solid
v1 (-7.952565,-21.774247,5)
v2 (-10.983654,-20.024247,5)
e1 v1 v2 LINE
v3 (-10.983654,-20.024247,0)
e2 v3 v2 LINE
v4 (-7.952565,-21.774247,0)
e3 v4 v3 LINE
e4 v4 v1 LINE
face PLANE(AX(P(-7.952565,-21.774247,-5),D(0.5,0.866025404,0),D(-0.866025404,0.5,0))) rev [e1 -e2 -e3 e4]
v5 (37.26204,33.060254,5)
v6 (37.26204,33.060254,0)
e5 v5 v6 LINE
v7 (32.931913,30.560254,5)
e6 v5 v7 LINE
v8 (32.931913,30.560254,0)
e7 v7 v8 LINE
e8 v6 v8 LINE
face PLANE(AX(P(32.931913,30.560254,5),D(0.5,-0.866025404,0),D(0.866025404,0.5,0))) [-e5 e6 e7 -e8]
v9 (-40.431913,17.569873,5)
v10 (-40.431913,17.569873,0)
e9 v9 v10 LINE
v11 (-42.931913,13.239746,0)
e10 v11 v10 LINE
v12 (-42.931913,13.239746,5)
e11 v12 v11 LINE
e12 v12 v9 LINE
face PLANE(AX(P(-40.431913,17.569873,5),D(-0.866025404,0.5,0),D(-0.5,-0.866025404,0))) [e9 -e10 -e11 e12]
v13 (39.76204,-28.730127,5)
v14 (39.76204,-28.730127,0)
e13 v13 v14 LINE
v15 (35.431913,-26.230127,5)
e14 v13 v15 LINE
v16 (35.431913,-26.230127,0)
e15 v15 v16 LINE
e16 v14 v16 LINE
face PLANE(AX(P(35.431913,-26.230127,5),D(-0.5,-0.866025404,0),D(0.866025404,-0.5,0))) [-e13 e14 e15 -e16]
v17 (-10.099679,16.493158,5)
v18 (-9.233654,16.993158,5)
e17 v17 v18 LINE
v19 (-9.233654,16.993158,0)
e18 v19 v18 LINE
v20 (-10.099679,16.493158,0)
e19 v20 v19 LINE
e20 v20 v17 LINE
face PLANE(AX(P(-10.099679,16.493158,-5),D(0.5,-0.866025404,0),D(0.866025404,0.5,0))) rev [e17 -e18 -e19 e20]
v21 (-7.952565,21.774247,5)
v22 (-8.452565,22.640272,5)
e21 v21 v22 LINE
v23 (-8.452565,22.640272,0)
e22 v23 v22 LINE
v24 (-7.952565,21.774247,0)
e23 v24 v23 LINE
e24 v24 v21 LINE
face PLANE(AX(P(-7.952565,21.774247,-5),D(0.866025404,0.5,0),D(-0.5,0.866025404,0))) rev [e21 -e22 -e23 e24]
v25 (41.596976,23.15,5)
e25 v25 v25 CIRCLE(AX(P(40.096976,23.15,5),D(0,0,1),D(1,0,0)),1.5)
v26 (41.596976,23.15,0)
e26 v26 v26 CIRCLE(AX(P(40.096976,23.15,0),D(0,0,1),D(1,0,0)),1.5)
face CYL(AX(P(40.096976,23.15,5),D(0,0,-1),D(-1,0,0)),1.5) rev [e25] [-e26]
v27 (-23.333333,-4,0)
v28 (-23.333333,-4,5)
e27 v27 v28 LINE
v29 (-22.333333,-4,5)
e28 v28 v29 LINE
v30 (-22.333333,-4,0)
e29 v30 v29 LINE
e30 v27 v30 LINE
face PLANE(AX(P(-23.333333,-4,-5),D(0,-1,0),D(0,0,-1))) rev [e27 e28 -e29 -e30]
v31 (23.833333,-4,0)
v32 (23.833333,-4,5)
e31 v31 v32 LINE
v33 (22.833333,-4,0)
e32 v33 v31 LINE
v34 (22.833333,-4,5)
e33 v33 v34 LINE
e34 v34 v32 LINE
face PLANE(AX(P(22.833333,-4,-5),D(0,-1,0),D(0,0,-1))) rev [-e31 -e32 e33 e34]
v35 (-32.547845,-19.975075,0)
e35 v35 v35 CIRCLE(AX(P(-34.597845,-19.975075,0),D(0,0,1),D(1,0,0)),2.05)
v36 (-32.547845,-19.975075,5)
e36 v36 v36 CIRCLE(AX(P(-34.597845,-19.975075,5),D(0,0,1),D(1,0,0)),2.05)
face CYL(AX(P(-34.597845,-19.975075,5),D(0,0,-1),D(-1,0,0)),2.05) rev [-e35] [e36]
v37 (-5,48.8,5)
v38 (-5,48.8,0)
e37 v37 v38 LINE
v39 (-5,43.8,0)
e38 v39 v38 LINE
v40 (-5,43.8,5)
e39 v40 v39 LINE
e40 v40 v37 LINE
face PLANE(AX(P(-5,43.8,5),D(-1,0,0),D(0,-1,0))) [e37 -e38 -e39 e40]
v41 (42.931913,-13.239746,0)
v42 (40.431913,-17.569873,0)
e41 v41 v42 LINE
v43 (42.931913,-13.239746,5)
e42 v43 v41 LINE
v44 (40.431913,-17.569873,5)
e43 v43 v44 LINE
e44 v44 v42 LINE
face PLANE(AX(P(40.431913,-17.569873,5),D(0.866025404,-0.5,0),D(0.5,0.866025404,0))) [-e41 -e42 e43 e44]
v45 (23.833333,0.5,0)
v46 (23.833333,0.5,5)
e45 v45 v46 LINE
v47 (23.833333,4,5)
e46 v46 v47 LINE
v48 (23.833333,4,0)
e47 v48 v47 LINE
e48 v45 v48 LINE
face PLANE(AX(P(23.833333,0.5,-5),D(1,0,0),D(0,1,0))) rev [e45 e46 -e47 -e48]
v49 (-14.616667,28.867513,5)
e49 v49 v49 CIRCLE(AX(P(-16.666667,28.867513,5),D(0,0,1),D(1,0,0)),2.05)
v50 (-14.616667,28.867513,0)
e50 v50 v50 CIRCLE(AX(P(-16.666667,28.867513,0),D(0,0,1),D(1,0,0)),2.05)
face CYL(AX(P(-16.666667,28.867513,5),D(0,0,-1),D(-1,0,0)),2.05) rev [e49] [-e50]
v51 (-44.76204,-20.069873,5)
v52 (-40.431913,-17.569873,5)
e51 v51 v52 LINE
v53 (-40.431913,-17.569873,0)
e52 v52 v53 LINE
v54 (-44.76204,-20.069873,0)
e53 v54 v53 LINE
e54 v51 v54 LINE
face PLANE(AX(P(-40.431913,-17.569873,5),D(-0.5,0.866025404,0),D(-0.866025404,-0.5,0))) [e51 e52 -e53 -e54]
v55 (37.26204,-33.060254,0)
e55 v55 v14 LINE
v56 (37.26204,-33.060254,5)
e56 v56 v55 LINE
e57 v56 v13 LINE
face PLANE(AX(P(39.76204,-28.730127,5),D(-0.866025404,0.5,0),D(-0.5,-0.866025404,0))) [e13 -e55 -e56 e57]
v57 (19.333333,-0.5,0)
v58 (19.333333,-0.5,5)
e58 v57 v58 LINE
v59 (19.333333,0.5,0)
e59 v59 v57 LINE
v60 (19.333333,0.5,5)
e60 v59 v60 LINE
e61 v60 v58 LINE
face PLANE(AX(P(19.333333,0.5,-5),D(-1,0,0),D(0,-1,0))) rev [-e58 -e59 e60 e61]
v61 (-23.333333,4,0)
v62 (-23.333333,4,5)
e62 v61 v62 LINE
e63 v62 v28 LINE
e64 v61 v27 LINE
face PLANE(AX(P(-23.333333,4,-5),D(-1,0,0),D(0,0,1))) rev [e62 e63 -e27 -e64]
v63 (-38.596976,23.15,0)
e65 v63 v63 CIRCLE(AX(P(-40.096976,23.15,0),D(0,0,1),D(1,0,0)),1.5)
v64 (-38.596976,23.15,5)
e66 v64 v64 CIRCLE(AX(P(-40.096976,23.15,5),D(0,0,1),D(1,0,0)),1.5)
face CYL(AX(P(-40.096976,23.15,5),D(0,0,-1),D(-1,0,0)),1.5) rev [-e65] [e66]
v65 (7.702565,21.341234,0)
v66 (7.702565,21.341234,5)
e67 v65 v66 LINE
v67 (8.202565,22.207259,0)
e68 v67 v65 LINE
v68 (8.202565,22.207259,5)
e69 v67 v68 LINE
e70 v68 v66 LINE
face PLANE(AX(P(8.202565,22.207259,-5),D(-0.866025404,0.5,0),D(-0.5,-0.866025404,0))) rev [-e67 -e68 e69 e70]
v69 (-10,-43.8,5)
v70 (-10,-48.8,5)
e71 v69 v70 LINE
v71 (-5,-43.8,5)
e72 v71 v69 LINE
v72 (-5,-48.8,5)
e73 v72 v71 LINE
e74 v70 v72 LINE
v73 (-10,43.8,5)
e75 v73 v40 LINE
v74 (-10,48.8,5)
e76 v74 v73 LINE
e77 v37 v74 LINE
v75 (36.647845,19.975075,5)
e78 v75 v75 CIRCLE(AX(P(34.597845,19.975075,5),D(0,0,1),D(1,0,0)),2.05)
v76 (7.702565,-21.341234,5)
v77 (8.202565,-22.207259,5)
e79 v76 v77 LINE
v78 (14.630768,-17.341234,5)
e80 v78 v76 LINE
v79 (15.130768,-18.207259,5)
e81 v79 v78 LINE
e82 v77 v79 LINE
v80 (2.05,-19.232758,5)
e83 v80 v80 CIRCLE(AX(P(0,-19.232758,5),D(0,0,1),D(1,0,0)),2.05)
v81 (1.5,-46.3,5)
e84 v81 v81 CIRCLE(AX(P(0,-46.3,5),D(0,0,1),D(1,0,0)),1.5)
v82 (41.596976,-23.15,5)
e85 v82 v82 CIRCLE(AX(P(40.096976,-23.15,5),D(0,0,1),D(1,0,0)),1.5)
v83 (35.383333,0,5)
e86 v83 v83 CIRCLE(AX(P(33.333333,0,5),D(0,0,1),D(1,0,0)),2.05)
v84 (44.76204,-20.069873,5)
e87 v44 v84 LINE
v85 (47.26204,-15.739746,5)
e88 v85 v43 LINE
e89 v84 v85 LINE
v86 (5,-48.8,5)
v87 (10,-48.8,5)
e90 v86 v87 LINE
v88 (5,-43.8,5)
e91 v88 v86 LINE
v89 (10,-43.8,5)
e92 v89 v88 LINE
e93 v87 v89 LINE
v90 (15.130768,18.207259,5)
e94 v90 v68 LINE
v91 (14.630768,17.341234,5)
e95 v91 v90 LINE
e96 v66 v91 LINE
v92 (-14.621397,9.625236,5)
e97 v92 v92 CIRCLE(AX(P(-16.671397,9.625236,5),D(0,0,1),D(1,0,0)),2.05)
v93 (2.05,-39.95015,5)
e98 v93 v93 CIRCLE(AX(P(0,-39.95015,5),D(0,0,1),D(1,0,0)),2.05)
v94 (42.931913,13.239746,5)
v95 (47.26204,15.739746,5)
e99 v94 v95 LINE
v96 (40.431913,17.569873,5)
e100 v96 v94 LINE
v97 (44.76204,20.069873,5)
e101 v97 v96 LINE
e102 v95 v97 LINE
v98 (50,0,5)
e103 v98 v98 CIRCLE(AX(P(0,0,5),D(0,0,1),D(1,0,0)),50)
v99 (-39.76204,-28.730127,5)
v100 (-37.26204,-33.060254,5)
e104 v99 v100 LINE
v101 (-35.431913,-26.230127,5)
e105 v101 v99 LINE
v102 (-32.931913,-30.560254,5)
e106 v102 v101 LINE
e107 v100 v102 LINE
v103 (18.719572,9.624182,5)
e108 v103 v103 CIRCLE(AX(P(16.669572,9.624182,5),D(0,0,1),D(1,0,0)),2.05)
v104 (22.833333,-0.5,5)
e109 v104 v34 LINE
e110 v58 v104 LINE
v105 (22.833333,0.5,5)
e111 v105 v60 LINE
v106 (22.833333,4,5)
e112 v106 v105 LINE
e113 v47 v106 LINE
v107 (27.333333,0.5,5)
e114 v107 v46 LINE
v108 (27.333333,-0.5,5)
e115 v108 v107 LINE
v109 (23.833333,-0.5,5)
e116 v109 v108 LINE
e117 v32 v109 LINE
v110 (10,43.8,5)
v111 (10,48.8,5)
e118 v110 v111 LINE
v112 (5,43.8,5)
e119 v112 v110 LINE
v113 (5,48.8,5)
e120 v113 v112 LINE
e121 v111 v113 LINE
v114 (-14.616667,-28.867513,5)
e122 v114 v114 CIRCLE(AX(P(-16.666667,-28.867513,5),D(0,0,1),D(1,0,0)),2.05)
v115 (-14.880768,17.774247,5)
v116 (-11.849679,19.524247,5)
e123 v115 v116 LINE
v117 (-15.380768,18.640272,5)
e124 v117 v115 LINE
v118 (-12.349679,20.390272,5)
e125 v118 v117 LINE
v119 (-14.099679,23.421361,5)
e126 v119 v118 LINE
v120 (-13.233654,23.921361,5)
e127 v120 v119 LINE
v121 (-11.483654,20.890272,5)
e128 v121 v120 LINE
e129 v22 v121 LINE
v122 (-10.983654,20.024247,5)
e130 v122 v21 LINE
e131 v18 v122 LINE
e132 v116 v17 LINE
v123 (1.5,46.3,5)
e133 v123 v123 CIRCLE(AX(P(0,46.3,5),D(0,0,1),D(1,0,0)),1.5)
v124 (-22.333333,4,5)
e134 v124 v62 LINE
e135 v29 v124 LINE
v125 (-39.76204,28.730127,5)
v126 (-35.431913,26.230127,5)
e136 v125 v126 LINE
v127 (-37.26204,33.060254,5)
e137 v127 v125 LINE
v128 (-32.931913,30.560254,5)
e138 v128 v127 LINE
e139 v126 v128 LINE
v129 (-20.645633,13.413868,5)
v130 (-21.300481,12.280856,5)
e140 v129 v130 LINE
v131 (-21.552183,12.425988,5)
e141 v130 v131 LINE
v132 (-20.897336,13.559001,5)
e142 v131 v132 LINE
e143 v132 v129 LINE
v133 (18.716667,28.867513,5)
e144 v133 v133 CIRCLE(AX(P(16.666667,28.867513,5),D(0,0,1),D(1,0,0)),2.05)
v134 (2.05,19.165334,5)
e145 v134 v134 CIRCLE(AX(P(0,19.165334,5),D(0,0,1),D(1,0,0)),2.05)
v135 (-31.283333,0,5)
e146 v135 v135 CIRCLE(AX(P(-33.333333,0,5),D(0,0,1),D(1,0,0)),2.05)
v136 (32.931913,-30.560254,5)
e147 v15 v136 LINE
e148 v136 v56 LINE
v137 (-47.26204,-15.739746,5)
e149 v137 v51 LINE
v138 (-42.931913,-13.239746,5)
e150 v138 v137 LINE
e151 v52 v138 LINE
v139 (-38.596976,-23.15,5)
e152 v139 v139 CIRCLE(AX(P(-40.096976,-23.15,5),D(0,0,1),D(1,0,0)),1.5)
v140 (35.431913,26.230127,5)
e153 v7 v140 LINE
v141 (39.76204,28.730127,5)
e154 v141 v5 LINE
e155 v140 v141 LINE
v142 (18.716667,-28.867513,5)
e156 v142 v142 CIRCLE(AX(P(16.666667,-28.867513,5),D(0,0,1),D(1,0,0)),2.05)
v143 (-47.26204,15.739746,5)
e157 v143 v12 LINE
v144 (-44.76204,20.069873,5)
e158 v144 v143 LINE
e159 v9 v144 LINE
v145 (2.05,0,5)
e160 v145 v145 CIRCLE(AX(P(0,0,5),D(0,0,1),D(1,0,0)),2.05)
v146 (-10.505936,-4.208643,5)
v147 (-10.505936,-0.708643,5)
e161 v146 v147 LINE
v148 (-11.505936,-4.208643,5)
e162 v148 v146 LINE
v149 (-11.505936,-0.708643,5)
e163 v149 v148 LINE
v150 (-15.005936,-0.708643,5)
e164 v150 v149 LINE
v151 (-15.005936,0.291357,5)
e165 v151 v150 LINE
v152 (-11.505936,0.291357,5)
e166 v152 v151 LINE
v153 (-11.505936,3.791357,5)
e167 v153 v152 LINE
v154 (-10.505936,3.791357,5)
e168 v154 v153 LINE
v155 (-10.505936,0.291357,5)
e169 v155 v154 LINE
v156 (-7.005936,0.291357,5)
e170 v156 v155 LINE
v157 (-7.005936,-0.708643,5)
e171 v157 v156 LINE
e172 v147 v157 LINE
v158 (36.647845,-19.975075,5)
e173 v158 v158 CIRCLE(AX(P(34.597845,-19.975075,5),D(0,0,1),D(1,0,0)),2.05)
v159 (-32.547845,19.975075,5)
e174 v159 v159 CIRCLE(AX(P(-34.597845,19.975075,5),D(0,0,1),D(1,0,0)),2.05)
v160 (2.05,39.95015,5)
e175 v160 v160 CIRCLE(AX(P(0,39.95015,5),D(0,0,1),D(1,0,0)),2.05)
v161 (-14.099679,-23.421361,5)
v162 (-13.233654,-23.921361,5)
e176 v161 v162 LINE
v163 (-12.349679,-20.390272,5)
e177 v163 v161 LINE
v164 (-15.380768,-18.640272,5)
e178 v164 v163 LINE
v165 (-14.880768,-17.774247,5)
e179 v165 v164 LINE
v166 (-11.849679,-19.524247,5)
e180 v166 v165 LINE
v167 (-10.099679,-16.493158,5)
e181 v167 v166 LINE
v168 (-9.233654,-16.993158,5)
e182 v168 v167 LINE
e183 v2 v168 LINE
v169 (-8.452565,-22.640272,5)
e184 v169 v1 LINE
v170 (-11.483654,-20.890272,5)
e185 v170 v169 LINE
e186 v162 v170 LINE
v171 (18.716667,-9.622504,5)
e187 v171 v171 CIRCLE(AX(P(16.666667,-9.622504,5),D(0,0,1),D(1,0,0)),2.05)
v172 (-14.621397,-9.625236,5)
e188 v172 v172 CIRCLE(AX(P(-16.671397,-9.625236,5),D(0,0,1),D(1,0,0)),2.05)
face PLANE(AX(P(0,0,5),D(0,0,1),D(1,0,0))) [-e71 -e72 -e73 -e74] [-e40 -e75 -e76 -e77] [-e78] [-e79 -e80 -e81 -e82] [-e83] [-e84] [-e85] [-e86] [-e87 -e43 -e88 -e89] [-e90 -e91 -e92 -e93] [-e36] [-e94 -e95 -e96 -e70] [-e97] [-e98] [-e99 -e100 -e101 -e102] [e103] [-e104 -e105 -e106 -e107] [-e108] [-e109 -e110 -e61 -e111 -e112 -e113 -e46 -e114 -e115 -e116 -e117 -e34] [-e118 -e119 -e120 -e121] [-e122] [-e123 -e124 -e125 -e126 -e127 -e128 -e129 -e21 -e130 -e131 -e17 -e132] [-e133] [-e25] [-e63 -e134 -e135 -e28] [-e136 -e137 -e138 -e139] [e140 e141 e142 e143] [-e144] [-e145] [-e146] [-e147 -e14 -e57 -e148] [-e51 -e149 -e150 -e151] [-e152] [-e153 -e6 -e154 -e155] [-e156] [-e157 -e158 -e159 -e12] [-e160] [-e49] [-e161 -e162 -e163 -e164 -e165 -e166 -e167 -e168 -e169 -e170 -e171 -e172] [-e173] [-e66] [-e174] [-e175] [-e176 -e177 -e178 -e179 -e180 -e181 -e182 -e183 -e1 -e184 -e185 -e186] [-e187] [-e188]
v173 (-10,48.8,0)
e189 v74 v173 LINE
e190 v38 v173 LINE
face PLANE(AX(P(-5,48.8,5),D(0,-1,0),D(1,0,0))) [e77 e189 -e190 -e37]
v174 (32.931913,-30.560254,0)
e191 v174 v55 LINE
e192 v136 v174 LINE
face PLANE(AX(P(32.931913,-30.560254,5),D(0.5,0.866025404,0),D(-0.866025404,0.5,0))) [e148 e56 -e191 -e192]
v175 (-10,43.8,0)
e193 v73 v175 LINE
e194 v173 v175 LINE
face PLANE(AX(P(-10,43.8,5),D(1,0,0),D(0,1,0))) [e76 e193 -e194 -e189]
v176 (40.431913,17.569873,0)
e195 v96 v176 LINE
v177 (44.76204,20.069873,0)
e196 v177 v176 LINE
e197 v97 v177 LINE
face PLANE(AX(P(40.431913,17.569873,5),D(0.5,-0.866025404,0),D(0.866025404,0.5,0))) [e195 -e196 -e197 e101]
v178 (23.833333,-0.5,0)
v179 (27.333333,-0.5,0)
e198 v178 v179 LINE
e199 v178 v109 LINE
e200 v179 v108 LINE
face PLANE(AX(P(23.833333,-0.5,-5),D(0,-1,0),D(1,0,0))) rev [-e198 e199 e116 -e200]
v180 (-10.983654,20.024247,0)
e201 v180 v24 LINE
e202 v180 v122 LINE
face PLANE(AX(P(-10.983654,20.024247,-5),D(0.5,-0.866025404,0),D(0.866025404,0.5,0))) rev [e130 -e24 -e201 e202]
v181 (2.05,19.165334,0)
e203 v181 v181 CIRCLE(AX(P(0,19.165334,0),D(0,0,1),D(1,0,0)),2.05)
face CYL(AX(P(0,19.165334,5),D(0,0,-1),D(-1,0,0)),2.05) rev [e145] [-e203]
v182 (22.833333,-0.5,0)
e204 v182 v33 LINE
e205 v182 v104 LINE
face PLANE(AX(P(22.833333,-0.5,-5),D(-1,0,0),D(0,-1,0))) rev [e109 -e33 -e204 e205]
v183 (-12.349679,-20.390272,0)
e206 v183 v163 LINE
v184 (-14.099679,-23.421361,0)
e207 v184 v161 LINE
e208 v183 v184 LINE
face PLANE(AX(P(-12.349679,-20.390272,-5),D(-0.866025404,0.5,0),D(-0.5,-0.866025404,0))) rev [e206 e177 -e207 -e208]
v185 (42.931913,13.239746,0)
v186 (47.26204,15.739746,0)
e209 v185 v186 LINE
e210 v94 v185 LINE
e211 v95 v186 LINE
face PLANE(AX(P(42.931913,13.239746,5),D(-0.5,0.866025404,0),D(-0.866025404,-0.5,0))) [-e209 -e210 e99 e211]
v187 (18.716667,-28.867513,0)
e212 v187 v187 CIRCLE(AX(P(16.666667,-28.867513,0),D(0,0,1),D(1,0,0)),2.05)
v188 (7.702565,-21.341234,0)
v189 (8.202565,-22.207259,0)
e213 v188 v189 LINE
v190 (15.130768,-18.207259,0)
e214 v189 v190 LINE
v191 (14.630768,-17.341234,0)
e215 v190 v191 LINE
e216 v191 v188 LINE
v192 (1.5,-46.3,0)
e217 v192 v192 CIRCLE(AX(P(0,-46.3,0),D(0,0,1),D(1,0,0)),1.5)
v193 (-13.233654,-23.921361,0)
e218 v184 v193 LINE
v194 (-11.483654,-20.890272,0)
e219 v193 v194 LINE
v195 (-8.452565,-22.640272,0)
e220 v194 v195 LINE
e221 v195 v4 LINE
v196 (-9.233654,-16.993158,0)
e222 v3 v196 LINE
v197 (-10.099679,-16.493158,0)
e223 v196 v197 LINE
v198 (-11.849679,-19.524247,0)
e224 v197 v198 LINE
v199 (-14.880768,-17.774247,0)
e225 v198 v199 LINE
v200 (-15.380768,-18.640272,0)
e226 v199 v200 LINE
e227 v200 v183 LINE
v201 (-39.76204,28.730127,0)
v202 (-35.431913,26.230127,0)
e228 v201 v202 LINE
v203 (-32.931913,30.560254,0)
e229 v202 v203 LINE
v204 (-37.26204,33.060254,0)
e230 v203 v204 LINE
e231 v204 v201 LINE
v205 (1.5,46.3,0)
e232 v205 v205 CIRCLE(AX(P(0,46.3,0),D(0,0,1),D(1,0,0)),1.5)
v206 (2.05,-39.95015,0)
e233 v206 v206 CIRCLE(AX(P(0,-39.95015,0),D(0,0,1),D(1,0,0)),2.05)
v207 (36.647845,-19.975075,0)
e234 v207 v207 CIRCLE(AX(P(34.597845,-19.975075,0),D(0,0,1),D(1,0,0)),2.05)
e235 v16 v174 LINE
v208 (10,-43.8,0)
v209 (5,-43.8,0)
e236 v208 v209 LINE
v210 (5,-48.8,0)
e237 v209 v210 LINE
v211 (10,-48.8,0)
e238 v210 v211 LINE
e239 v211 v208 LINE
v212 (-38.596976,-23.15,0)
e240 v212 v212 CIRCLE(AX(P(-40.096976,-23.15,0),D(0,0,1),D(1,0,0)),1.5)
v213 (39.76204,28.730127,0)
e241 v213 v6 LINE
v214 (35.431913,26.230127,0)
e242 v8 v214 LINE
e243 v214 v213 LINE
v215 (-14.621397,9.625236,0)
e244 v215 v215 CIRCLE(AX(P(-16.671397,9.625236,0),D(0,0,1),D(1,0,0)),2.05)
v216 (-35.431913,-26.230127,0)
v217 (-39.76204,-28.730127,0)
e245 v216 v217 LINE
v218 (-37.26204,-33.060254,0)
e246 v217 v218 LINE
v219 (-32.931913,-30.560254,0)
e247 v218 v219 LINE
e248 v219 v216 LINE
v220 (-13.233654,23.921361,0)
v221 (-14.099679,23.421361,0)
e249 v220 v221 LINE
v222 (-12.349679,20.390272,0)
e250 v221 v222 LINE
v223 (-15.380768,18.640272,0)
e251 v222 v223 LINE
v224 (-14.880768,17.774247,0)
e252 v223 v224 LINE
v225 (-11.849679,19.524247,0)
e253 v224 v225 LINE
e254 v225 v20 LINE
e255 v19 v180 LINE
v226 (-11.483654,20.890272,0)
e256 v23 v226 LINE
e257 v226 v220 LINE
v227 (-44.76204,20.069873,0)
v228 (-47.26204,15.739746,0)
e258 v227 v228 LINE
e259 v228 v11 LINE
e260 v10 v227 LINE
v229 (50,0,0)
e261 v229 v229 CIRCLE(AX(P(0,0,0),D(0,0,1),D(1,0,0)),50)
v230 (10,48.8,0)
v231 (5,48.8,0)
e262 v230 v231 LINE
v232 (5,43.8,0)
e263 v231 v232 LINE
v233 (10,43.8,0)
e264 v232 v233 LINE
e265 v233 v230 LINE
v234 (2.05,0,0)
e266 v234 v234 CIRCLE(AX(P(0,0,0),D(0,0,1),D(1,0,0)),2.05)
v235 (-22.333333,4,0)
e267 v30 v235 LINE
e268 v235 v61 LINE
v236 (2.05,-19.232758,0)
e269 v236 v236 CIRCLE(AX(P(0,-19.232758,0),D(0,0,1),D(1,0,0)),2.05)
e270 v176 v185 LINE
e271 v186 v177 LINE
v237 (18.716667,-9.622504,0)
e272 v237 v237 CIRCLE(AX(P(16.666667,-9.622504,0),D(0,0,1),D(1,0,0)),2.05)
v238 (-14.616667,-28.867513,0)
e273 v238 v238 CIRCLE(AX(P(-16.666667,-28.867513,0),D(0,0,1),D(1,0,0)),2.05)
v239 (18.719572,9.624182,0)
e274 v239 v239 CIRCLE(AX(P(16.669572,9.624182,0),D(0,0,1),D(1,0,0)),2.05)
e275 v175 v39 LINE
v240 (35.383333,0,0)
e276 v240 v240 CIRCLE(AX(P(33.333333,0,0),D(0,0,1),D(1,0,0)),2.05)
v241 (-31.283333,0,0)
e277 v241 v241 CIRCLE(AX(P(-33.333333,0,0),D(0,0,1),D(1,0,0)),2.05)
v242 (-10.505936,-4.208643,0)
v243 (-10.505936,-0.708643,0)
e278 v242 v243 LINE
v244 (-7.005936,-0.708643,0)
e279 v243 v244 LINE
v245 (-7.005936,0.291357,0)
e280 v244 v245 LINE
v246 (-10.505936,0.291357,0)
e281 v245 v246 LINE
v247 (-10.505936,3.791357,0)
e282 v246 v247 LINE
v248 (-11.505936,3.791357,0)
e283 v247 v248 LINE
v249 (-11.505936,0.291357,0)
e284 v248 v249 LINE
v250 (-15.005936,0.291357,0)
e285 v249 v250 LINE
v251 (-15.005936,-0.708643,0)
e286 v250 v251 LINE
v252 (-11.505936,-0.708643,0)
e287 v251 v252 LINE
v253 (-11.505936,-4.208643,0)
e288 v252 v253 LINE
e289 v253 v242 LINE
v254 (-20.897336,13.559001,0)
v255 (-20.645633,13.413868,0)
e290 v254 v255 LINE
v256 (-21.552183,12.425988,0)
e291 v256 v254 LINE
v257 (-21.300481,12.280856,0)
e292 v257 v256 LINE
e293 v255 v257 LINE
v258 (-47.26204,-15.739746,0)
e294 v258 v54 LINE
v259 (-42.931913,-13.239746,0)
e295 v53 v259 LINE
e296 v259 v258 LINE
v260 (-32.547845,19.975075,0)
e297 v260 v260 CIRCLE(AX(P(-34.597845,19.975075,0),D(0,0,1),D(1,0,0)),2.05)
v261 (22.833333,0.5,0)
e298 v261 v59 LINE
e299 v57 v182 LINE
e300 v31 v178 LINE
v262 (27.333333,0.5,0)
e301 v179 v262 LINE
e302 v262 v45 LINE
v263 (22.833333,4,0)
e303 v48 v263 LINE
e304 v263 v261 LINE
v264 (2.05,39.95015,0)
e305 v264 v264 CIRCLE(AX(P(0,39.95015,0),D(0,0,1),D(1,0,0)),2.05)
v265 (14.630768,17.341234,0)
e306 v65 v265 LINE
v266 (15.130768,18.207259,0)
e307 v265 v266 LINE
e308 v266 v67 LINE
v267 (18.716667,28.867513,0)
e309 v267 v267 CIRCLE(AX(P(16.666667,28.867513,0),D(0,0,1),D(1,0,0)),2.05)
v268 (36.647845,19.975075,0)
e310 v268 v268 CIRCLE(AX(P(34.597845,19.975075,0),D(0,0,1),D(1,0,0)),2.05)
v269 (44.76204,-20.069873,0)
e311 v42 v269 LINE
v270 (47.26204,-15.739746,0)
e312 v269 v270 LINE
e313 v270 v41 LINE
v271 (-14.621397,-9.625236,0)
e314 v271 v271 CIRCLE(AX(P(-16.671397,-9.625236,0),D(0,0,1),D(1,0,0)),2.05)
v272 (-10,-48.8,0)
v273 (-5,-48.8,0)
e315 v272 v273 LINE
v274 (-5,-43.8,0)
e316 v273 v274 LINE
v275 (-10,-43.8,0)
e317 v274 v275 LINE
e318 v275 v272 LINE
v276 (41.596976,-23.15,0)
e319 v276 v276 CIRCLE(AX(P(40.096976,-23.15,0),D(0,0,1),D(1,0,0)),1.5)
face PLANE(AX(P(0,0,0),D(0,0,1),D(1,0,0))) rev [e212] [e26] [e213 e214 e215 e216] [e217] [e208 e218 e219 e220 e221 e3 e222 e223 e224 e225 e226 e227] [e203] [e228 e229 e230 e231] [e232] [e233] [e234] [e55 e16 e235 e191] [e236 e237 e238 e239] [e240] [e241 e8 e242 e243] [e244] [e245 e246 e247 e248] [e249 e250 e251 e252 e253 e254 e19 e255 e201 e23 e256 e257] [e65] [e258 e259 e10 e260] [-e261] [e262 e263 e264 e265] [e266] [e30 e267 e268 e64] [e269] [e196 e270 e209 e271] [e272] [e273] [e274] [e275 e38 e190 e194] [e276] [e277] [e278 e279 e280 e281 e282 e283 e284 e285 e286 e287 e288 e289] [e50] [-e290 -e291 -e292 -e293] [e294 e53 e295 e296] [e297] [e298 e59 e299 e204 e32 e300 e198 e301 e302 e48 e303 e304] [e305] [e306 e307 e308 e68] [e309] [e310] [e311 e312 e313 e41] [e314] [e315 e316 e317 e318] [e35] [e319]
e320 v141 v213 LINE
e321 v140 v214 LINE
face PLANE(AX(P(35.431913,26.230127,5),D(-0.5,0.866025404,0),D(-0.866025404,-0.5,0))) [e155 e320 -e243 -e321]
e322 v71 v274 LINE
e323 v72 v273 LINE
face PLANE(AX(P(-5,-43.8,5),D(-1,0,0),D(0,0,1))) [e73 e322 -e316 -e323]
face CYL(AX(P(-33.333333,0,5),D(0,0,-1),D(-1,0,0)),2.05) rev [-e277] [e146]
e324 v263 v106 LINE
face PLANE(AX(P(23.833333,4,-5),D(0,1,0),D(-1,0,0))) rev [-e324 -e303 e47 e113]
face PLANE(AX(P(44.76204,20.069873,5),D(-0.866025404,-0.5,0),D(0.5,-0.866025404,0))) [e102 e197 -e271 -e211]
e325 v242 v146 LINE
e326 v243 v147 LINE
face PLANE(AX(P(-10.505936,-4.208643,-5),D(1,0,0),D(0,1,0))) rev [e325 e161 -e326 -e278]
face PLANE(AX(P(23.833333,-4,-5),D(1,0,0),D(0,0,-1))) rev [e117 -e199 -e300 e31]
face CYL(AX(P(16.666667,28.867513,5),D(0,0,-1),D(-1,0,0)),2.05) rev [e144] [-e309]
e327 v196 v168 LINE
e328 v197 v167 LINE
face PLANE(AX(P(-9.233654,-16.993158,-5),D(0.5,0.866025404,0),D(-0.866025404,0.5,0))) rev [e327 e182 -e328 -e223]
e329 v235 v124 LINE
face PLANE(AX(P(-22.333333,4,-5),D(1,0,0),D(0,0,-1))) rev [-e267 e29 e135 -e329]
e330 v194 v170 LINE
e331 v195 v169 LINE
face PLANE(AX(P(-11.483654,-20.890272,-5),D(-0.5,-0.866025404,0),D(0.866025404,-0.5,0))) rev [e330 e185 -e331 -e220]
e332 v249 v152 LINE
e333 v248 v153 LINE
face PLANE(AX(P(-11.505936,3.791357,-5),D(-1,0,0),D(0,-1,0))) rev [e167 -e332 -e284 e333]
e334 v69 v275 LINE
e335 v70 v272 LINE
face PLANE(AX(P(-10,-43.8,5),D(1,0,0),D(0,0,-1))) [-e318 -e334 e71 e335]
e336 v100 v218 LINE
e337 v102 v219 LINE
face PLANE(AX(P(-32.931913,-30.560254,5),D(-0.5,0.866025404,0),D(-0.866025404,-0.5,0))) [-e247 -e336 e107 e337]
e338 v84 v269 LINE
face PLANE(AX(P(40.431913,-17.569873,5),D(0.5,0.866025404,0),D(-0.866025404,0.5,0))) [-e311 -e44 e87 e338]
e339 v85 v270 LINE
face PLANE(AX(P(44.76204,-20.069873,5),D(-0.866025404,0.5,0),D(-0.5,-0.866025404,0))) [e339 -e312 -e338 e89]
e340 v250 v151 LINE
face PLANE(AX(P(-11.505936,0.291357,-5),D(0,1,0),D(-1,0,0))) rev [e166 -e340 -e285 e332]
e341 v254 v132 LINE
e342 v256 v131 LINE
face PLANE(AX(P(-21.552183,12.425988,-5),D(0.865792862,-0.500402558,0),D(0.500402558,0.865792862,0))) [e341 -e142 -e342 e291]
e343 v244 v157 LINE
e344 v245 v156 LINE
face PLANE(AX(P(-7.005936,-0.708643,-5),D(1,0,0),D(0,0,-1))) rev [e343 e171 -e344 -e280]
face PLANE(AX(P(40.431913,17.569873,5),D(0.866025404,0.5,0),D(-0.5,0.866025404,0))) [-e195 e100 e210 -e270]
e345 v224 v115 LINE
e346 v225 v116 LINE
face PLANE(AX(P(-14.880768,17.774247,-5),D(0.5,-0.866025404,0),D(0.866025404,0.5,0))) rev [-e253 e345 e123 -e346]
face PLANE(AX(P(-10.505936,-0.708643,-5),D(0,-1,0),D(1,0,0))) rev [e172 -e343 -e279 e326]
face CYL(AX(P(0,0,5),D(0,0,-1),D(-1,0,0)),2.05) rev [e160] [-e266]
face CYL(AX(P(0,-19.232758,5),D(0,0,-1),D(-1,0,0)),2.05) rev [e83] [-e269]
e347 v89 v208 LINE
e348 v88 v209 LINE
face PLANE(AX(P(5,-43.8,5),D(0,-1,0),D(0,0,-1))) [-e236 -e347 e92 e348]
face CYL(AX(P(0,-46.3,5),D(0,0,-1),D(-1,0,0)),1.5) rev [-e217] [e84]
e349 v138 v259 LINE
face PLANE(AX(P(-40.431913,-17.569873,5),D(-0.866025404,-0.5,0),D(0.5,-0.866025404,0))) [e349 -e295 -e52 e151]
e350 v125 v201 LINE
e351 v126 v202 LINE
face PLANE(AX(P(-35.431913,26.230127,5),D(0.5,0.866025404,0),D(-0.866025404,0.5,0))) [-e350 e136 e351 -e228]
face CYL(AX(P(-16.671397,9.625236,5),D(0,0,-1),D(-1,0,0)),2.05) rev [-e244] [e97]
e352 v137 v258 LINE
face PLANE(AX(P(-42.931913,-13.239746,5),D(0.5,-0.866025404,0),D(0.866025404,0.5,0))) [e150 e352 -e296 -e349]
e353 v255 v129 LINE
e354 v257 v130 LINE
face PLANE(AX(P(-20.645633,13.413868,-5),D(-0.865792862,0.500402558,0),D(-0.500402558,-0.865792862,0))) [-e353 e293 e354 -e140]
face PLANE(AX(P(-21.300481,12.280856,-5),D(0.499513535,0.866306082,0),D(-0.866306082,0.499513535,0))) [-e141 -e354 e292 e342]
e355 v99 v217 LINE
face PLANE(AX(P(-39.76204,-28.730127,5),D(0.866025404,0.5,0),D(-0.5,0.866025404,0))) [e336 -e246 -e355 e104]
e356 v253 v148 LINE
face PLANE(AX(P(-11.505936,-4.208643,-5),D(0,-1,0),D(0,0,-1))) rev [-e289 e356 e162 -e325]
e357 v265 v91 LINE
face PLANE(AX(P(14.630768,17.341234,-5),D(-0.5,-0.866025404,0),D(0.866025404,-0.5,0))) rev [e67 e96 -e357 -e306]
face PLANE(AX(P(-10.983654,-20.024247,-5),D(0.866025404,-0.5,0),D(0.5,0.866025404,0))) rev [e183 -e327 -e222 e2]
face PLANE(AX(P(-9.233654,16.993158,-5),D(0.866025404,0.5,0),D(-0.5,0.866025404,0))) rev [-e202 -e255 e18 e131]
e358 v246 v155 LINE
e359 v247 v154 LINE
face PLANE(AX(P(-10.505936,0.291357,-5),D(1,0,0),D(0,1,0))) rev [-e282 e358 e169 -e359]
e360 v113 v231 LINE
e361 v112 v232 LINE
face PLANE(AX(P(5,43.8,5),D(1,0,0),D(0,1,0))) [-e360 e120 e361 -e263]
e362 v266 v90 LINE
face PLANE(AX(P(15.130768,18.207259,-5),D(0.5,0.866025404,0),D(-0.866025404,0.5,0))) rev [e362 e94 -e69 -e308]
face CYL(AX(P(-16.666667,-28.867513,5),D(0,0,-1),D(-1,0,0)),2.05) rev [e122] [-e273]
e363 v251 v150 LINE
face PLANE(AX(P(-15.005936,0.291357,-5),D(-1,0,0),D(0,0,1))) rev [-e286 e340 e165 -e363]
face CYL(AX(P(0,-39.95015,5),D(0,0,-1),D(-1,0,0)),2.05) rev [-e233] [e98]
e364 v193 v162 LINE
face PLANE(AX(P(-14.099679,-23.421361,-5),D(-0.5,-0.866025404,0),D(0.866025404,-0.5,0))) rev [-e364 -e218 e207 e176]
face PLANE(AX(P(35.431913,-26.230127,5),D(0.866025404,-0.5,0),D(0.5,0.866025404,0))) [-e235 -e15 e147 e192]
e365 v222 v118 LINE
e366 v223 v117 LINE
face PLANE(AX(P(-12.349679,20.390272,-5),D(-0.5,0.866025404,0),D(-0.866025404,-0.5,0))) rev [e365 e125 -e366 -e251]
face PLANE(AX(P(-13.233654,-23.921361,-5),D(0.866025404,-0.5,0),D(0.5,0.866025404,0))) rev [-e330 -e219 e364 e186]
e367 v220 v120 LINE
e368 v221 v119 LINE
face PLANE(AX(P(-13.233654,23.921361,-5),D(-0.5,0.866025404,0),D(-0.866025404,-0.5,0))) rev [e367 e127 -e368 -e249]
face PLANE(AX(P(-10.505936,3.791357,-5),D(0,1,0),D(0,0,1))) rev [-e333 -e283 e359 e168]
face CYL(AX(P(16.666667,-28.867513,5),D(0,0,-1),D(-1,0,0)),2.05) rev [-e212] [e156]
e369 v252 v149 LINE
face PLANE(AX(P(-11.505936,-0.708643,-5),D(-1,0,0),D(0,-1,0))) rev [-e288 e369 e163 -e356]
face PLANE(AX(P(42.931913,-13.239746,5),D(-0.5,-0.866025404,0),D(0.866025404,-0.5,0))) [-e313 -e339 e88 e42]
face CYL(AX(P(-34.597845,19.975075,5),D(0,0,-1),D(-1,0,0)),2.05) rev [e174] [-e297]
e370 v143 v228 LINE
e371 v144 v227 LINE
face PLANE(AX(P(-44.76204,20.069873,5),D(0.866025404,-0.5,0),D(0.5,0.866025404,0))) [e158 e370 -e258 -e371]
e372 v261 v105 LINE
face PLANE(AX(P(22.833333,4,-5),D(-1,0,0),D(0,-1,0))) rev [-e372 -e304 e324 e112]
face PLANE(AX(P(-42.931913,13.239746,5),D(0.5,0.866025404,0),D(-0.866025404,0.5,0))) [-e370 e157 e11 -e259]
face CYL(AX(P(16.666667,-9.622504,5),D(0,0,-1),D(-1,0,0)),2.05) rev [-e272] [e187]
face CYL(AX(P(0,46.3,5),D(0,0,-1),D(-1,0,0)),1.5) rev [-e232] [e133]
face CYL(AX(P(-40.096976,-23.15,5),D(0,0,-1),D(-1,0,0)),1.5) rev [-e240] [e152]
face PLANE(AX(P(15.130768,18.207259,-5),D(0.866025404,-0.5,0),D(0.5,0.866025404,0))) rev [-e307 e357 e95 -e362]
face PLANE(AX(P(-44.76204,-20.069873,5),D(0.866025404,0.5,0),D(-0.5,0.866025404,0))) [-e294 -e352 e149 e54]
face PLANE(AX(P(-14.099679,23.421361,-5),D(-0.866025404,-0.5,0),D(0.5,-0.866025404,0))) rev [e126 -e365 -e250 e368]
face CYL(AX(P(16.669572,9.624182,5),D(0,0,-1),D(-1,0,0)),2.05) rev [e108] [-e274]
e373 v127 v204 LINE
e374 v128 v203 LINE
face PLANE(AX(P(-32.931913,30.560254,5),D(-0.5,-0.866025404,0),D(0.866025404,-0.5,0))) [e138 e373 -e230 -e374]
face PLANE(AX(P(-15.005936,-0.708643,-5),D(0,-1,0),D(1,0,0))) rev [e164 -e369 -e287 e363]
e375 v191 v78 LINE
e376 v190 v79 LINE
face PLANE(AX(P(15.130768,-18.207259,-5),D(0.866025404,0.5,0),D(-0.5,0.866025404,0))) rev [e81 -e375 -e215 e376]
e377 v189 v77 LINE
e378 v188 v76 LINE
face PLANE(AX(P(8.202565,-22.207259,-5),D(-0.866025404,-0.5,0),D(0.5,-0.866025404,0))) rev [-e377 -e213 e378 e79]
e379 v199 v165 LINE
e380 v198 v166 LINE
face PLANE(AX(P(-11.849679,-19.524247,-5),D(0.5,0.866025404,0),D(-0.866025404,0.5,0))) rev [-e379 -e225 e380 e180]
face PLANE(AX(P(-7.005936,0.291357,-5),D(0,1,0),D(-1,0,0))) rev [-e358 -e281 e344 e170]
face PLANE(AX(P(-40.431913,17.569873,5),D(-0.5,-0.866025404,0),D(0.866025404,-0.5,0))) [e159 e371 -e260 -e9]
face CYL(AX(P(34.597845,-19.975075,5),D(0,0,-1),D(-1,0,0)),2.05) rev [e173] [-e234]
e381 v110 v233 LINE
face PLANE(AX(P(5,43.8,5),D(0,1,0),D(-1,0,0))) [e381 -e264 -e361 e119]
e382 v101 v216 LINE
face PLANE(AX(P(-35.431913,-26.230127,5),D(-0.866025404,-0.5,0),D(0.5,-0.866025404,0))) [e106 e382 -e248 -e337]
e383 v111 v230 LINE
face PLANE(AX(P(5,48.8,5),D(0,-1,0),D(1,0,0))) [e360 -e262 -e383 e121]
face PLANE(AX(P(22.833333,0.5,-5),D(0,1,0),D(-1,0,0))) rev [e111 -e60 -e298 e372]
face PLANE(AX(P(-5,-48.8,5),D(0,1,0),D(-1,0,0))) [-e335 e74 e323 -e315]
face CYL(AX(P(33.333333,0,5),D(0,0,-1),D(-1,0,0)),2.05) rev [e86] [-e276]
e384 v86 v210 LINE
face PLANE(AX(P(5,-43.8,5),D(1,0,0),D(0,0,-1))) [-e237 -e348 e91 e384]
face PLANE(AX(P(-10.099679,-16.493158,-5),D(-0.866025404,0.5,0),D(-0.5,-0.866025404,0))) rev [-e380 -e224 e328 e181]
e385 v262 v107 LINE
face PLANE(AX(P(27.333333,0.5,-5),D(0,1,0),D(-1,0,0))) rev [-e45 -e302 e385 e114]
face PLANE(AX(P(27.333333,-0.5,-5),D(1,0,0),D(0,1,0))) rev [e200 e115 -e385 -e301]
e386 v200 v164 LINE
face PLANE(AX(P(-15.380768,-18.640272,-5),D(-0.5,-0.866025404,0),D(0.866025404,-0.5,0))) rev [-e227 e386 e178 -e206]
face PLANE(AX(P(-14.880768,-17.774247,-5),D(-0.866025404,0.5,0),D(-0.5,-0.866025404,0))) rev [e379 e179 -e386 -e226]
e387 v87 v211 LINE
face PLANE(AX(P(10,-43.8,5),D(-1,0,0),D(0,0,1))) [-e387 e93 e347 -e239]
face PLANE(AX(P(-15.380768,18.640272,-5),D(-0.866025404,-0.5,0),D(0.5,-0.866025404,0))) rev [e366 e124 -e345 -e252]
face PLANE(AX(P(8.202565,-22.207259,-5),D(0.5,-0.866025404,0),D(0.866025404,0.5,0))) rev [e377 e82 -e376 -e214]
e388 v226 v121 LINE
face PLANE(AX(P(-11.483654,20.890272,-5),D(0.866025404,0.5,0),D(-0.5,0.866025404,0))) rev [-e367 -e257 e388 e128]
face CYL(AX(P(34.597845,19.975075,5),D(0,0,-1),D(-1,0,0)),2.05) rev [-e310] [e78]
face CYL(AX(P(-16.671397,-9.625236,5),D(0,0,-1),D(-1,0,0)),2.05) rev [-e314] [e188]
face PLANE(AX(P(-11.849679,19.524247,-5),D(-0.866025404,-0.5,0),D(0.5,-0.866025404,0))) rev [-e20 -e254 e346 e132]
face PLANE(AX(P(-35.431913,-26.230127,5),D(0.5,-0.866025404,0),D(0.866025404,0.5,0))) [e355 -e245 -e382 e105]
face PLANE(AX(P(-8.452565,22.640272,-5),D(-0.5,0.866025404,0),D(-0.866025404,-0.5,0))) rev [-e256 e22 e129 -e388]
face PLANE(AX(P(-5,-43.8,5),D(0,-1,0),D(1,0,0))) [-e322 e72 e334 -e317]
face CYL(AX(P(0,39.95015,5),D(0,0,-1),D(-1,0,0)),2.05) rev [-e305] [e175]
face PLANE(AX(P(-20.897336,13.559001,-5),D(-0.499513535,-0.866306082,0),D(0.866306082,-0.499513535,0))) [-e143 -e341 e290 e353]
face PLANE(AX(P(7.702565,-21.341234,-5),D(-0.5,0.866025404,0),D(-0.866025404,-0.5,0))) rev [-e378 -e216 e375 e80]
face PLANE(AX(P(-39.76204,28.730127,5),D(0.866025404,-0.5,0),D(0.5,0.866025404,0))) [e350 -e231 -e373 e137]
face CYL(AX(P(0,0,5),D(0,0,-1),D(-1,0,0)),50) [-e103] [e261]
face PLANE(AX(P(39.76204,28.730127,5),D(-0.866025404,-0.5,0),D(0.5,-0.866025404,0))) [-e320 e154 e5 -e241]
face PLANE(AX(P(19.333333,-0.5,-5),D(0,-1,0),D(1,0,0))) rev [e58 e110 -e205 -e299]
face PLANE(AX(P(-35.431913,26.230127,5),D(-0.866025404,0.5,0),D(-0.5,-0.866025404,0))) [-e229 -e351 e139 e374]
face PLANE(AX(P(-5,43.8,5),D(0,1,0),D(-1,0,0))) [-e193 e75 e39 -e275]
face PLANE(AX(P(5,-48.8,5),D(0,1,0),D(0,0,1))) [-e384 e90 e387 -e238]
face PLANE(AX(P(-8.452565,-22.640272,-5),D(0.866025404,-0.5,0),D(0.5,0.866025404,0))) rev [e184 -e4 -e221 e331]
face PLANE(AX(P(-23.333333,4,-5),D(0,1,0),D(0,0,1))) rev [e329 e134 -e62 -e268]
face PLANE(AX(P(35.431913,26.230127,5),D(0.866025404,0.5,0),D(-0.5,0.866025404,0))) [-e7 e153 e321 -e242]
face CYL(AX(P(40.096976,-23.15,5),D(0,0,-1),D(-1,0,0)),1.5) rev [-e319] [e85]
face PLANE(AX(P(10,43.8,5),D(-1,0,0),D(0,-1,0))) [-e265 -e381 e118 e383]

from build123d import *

# Parameters (mm, degrees)
BOSS_EXTRU_1_OUTLINE_R   = 50
BOSS_EXTRU_1_OUTLINE_W   = 5
BOSS_EXTRU_1_OUTLINE_H   = 5
BOSS_EXTRU_1_OUTLINE_R_2 = 2.05
BOSS_EXTRU_1_OUTLINE_R_3 = 1.5
BOSS_EXTRU_1_DEPTH       = 5
SKETCH3_W                = 1
SKETCH3_H                = 8
CUT_EXTRUDE2_DEPTH       = 10


# Read off the part's stored shape, not the designer's step: Boss.-Extru.1
with BuildPart() as part:
    # Boss.-Extru.1 outline → Boss.-Extru.1 (new body)
    with BuildSketch(Plane.XY):
        Circle(BOSS_EXTRU_1_OUTLINE_R)
        Polygon((-37.262039705, -33.060254038), (-39.762039705, -28.730127019), (-35.431912686, -26.230127019), (-32.931912686, -30.560254038), align=None, mode=Mode.SUBTRACT)
        with Locations((-7.5, -46.3)):
            Rectangle(BOSS_EXTRU_1_OUTLINE_W, BOSS_EXTRU_1_OUTLINE_H, mode=Mode.SUBTRACT)
        with Locations((-16.666666667, -28.867513459)):
            Circle(BOSS_EXTRU_1_OUTLINE_R_2, mode=Mode.SUBTRACT)
        with Locations((-40.096976195, -23.15)):
            Circle(BOSS_EXTRU_1_OUTLINE_R_3, mode=Mode.SUBTRACT)
        Polygon((-42.931912686, -13.239745962), (-40.431912686, -17.569872981), (-44.762039705, -20.069872981), (-47.262039705, -15.739745962), align=None, mode=Mode.SUBTRACT)
        with Locations((-34.597845014, -19.975075132)):
            Circle(BOSS_EXTRU_1_OUTLINE_R_2, mode=Mode.SUBTRACT)
        with Locations((-16.671397033, -9.625235564)):
            Circle(BOSS_EXTRU_1_OUTLINE_R_2, mode=Mode.SUBTRACT)
        with Locations((0, -46.3)):
            Circle(BOSS_EXTRU_1_OUTLINE_R_3, mode=Mode.SUBTRACT)
        with Locations((7.5, -46.3)):
            Rectangle(BOSS_EXTRU_1_OUTLINE_W, BOSS_EXTRU_1_OUTLINE_H, mode=Mode.SUBTRACT)
        with Locations((0, -39.950150265)):
            Circle(BOSS_EXTRU_1_OUTLINE_R_2, mode=Mode.SUBTRACT)
        with Locations((16.666666667, -28.867513459)):
            Circle(BOSS_EXTRU_1_OUTLINE_R_2, mode=Mode.SUBTRACT)
        Polygon((32.931912686, -30.560254038), (35.431912686, -26.230127019), (39.762039705, -28.730127019), (37.262039705, -33.060254038), align=None, mode=Mode.SUBTRACT)
        with Locations((0, -19.232757636)):
            Circle(BOSS_EXTRU_1_OUTLINE_R_2, mode=Mode.SUBTRACT)
        with Locations((16.666666667, -9.622504487)):
            Circle(BOSS_EXTRU_1_OUTLINE_R_2, mode=Mode.SUBTRACT)
        with Locations((34.597845014, -19.975075132)):
            Circle(BOSS_EXTRU_1_OUTLINE_R_2, mode=Mode.SUBTRACT)
        with Locations((40.096976195, -23.15)):
            Circle(BOSS_EXTRU_1_OUTLINE_R_3, mode=Mode.SUBTRACT)
        Polygon((47.262039705, -15.739745962), (44.762039705, -20.069872981), (40.431912686, -17.569872981), (42.931912686, -13.239745962), align=None, mode=Mode.SUBTRACT)
        with Locations((-33.333333333, 0)):
            Circle(BOSS_EXTRU_1_OUTLINE_R_2, mode=Mode.SUBTRACT)
        Polygon((-47.262039705, 15.739745962), (-44.762039705, 20.069872981), (-40.431912686, 17.569872981), (-42.931912686, 13.239745962), align=None, mode=Mode.SUBTRACT)
        with Locations((-40.096976195, 23.15)):
            Circle(BOSS_EXTRU_1_OUTLINE_R_3, mode=Mode.SUBTRACT)
        with Locations((-34.597845014, 19.975075132)):
            Circle(BOSS_EXTRU_1_OUTLINE_R_2, mode=Mode.SUBTRACT)
        with Locations((-16.671397032, 9.625235564)):
            Circle(BOSS_EXTRU_1_OUTLINE_R_2, mode=Mode.SUBTRACT)
        Polygon((-32.931912686, 30.560254038), (-35.431912686, 26.230127019), (-39.762039705, 28.730127019), (-37.262039705, 33.060254038), align=None, mode=Mode.SUBTRACT)
        with Locations((-16.666666667, 28.867513459)):
            Circle(BOSS_EXTRU_1_OUTLINE_R_2, mode=Mode.SUBTRACT)
        with Locations((-7.5, 46.3)):
            Rectangle(BOSS_EXTRU_1_OUTLINE_W, BOSS_EXTRU_1_OUTLINE_H, mode=Mode.SUBTRACT)
        Circle(BOSS_EXTRU_1_OUTLINE_R_2, mode=Mode.SUBTRACT)
        with Locations((16.669571796, 9.624181764)):
            Circle(BOSS_EXTRU_1_OUTLINE_R_2, mode=Mode.SUBTRACT)
        with Locations((0, 19.165334425)):
            Circle(BOSS_EXTRU_1_OUTLINE_R_2, mode=Mode.SUBTRACT)
        with Locations((33.333333333, 0)):
            Circle(BOSS_EXTRU_1_OUTLINE_R_2, mode=Mode.SUBTRACT)
        with Locations((34.597845014, 19.975075133)):
            Circle(BOSS_EXTRU_1_OUTLINE_R_2, mode=Mode.SUBTRACT)
        Polygon((42.931912686, 13.239745962), (40.431912686, 17.569872981), (44.762039705, 20.069872981), (47.262039705, 15.739745962), align=None, mode=Mode.SUBTRACT)
        with Locations((40.096976195, 23.15)):
            Circle(BOSS_EXTRU_1_OUTLINE_R_3, mode=Mode.SUBTRACT)
        with Locations((16.666666667, 28.867513459)):
            Circle(BOSS_EXTRU_1_OUTLINE_R_2, mode=Mode.SUBTRACT)
        with Locations((0, 39.950150265)):
            Circle(BOSS_EXTRU_1_OUTLINE_R_2, mode=Mode.SUBTRACT)
        with Locations((0, 46.3)):
            Circle(BOSS_EXTRU_1_OUTLINE_R_3, mode=Mode.SUBTRACT)
        with Locations((7.5, 46.3)):
            Rectangle(BOSS_EXTRU_1_OUTLINE_W, BOSS_EXTRU_1_OUTLINE_H, mode=Mode.SUBTRACT)
        Polygon((37.262039705, 33.060254038), (39.762039705, 28.730127019), (35.431912686, 26.230127019), (32.931912686, 30.560254038), align=None, mode=Mode.SUBTRACT)
    extrude(amount=BOSS_EXTRU_1_DEPTH)

    # Sketch3 → Cut-Extrude2 (cut)
    with BuildSketch(Plane.XY.offset(5)):
        with Locations((-22.833333333, 0)):
            Rectangle(SKETCH3_W, SKETCH3_H)
        Polygon((-13.233653965, 23.921361037), (-14.099679369, 23.421361037), (-12.349679369, 20.390272124), (-15.380768282, 18.640272124), (-14.880768282, 17.77424672), (-11.849679369, 19.52424672), (-10.099679369, 16.493157806), (-9.233653965, 16.993157806), (-10.983653965, 20.02424672), (-7.952565052, 21.77424672), (-8.452565052, 22.640272124), (-11.483653965, 20.890272124), align=None)
        Polygon((15.130768282, 18.207259422), (14.630768282, 17.341234018), (7.702565052, 21.341234018), (8.202565052, 22.207259422), align=None)
        Polygon((8.202565052, -22.207259422), (7.702565052, -21.341234018), (14.630768282, -17.341234018), (15.130768282, -18.207259422), align=None)
        Polygon((27.333333333, -0.5), (27.333333333, 0.5), (23.833333333, 0.5), (23.833333333, 4), (22.833333333, 4), (22.833333333, 0.5), (19.333333333, 0.5), (19.333333333, -0.5), (22.833333333, -0.5), (22.833333333, -4), (23.833333333, -4), (23.833333333, -0.5), align=None)
        Polygon((-14.099679369, -23.421361037), (-13.233653965, -23.921361037), (-11.483653965, -20.890272124), (-8.452565052, -22.640272124), (-7.952565052, -21.77424672), (-10.983653965, -20.02424672), (-9.233653965, -16.993157806), (-10.099679369, -16.493157806), (-11.849679369, -19.52424672), (-14.880768282, -17.77424672), (-15.380768282, -18.640272124), (-12.349679369, -20.390272124), align=None)
        Polygon((-7.005935602, -0.708643072), (-7.005935602, 0.291356928), (-10.505935602, 0.291356928), (-10.505935602, 3.791356928), (-11.505935602, 3.791356928), (-11.505935602, 0.291356928), (-15.005935602, 0.291356928), (-15.005935602, -0.708643072), (-11.505935602, -0.708643072), (-11.505935602, -4.208643072), (-10.505935602, -4.208643072), (-10.505935602, -0.708643072), align=None)
        Polygon((-20.645633013, 13.413868493), (-21.300480769, 12.280855673), (-21.552183494, 12.425987884), (-20.897335737, 13.559000705), align=None)
    extrude(amount=-CUT_EXTRUDE2_DEPTH, mode=Mode.SUBTRACT)


solid = part.part
